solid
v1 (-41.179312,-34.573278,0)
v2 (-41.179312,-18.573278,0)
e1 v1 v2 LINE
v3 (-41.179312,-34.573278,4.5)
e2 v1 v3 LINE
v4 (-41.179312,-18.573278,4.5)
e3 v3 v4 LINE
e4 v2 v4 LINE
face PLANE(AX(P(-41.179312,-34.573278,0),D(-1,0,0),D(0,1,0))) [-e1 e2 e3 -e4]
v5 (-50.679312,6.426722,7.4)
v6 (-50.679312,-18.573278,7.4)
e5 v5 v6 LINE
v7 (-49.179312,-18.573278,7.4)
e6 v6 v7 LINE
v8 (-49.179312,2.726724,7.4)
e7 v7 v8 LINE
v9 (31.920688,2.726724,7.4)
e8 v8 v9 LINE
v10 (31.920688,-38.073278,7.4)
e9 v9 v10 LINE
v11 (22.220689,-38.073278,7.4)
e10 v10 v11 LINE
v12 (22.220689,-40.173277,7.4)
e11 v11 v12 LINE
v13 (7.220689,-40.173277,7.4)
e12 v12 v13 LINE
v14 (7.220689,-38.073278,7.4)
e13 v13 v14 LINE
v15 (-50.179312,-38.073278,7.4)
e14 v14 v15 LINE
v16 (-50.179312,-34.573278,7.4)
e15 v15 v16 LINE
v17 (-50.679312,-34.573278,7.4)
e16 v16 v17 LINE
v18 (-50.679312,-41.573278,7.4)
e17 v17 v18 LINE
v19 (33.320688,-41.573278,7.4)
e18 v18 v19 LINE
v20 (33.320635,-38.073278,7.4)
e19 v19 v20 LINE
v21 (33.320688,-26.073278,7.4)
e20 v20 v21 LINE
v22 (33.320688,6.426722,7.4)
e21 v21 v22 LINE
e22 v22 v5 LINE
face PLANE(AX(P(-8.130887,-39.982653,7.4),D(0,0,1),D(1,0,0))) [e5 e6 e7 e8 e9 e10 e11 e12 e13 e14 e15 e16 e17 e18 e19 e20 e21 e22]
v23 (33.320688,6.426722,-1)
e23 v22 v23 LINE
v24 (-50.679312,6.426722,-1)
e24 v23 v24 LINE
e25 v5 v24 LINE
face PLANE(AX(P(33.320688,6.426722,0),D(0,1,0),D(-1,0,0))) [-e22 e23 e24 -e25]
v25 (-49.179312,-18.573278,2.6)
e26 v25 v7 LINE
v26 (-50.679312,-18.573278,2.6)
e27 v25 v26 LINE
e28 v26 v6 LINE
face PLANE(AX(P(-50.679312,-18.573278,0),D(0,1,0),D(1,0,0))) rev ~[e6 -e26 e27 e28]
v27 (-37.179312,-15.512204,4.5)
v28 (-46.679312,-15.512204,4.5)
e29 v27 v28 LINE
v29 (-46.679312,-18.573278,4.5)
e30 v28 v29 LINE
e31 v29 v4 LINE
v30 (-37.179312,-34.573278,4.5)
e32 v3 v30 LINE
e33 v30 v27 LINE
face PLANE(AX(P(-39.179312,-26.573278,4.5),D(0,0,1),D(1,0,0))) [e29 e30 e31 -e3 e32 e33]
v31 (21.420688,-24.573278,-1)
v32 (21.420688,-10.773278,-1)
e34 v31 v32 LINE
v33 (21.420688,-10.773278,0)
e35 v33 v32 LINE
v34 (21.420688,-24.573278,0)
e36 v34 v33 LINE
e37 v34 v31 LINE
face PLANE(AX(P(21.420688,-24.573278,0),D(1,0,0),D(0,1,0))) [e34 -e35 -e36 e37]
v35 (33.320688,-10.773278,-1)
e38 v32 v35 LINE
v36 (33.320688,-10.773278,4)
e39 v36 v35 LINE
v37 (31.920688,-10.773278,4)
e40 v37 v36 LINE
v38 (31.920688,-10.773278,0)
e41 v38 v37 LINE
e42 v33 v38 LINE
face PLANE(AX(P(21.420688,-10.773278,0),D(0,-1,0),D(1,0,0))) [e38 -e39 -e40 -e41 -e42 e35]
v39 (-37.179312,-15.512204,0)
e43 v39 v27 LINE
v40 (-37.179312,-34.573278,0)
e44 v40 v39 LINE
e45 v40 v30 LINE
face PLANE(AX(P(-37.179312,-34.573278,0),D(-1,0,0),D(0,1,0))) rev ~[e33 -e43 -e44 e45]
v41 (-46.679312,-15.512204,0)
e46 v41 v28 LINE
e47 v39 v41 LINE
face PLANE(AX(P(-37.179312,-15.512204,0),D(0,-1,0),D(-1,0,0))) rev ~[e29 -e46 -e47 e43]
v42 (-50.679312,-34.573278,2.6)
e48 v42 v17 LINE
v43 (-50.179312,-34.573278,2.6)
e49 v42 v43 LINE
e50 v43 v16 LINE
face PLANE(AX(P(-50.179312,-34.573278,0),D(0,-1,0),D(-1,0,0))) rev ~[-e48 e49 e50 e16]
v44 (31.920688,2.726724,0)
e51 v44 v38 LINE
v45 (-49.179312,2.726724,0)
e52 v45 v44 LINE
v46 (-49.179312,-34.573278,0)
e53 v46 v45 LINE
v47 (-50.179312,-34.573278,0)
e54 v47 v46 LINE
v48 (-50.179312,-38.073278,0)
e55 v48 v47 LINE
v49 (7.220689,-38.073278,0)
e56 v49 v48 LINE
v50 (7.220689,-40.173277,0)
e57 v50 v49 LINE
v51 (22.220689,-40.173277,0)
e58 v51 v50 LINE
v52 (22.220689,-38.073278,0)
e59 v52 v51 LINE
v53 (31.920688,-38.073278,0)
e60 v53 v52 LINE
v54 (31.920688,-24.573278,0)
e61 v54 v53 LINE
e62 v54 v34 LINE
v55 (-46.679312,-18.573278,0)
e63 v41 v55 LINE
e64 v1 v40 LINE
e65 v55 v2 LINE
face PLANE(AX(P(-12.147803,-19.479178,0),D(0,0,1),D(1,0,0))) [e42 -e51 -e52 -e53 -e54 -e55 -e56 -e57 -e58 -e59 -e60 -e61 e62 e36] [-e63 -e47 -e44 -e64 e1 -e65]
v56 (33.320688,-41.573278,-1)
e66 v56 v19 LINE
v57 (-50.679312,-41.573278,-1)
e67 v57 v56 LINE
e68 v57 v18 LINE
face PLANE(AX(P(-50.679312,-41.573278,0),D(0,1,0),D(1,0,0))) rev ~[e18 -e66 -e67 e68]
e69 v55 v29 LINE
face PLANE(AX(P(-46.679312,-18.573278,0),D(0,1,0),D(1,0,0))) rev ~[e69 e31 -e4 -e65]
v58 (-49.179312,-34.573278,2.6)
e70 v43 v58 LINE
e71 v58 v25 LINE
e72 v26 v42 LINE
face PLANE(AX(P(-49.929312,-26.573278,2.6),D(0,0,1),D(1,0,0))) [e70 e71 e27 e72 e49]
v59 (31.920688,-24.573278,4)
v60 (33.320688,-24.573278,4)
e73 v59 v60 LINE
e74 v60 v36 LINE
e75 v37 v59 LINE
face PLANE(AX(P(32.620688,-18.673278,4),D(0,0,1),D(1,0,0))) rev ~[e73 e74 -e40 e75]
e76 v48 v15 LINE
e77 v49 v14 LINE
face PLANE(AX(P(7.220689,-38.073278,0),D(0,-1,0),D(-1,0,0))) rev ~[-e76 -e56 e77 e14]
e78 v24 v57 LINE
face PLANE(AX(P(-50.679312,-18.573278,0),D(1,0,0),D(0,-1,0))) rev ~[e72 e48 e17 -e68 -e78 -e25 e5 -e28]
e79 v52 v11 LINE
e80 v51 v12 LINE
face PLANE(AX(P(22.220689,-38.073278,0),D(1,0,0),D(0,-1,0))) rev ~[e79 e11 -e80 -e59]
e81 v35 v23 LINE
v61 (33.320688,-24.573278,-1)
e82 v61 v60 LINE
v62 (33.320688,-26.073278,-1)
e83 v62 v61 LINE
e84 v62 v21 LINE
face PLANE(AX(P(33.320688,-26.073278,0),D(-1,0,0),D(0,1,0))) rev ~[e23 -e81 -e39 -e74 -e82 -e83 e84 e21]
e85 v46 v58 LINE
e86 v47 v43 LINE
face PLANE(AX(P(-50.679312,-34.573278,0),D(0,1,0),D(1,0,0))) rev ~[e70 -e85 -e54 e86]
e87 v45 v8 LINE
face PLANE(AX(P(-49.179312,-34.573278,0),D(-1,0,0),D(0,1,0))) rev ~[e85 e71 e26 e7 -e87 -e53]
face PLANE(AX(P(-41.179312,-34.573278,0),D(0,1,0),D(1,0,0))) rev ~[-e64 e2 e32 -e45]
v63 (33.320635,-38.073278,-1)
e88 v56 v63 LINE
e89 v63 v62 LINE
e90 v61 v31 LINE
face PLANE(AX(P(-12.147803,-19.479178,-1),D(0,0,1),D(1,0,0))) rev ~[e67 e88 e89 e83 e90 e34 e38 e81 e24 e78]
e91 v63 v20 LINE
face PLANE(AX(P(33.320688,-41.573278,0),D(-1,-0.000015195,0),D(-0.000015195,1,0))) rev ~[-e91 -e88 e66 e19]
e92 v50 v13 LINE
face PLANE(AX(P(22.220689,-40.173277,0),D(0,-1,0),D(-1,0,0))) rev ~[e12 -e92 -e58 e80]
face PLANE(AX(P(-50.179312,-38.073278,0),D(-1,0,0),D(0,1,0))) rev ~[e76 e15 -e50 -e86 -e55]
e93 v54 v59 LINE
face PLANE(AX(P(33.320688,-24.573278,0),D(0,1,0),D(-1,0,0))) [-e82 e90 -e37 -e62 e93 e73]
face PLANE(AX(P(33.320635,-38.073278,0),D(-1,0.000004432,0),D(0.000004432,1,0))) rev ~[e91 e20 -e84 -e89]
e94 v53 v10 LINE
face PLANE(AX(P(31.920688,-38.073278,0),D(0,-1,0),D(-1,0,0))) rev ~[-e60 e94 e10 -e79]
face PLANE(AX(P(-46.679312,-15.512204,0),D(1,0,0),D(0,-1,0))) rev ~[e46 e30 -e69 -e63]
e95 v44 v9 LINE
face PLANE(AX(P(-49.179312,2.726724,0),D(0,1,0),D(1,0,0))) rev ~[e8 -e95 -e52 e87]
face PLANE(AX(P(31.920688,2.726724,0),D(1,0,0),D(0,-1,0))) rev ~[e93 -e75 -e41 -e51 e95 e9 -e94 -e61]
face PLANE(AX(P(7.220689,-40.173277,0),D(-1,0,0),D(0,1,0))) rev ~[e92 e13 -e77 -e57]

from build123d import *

# Parameters (mm, degrees)
F0_W     = 4
F0_H     = 16
F1_DEPTH = 1
F0_W_2   = 1.4000003636
F0_H_2   = 11.8
F0_H_3   = 2
F2_DEPTH = 7.4
F3_DEPTH = 2.6
F4_DEPTH = 4.5
F5_DEPTH = 4


# Not quite as in the source:
# - ends of sketch curves that miss each other by under 0.0002 mm in the source are joined
# - a feature names something its author has since deleted; it is built from what else it names


with BuildPart() as f1:
    # F0 (on Top) → F1 (new body)
    with BuildSketch(Plane.XY):
        Polygon((-46.6793118417, -34.5732776225), (-46.6793118417, -35.6732776225), (9.7206891477, -35.6732776225), (9.7206891477, -37.6732772589), (19.7206891477, -37.6732772589), (19.7206891477, -35.5732776225), (29.4207941621, -35.5732776225), (29.4207941621, -34.5732776225), (31.9206877947, -34.5732776225), (31.9206877947, -26.0732776225), (29.4206877947, -26.0732776225), (29.4206877947, -24.5732776225), (21.4206877947, -24.5732776225), (21.4206877947, -12.7732776225), (21.4206877947, -10.7732776225), (29.4206877947, -10.7732776225), (29.4206877947, 0.2267237306), (-46.6793118417, 0.2267237306), (-46.6793118417, -15.5122037977), (-37.1793118417, -15.5122037977), (-37.1793118417, -18.5732776225), (-37.1793118417, -34.5732776225), (-41.1793118417, -34.5732776225), (-41.1793118417, -18.5732776225), (-46.6793118417, -18.5732776225), (-49.1793118417, -18.5732776225), (-49.1793118417, -34.5732776225), align=None)
        Polygon((-49.1793118417, 2.7267237306), (-49.1793118417, -18.5732776225), (-46.6793118417, -18.5732776225), (-46.6793118417, -15.5122037977), (-46.6793118417, 0.2267237306), (29.4206877947, 0.2267237306), (29.4206877947, -10.7732776225), (31.9206877947, -10.7732776225), (31.9206877947, 2.7267237306), align=None)
        Polygon((-50.6793118417, -1.5732776225), (-50.6793118417, -18.5732776225), (-49.1793118417, -18.5732776225), (-49.1793118417, 2.7267237306), (31.9206877947, 2.7267237306), (31.9206877947, -10.7732776225), (33.3206881583, -10.7732776225), (33.3206881583, 6.4267223775), (30.3206881583, 6.4267223775), (-50.6793118417, 6.4267223775), align=None)
        Polygon((-46.6793118417, -35.6732776225), (-46.6793118417, -38.0732776225), (7.2206891477, -38.0732776225), (7.2206891477, -40.1732772589), (22.2206891477, -40.1732772589), (22.2206891477, -38.0732776225), (29.4207941621, -38.0732776225), (31.9206877947, -38.0732776225), (31.9206877947, -34.5732776225), (29.4207941621, -34.5732776225), (29.4207941621, -35.5732776225), (19.7206891477, -35.5732776225), (19.7206891477, -37.6732772589), (9.7206891477, -37.6732772589), (9.7206891477, -35.6732776225), align=None)
        Polygon((-50.6793118417, -38.0732776225), (-50.6793118417, -41.5732776225), (30.3206881583, -41.5732776225), (33.3206881583, -41.5732776225), (33.3206349746, -38.0732776225), (31.9206877947, -38.0732776225), (29.4207941621, -38.0732776225), (22.2206891477, -38.0732776225), (22.2206891477, -40.1732772589), (7.2206891477, -40.1732772589), (7.2206891477, -38.0732776225), (-46.6793118417, -38.0732776225), (-50.1793118417, -38.0732776225), align=None)
        Polygon((31.9206877947, -26.0732776225), (33.3206881583, -26.0732776225), (33.3206881583, -24.5732776225), (31.9206877947, -24.5732776225), (31.9206877947, -25.7732776225), align=None)
        Polygon((33.3205817909, -34.5732776225), (33.3206349746, -38.0732776225), (33.3206881583, -26.0732776225), (31.9206877947, -26.0732776225), (31.9206877947, -34.5732776225), align=None)
        Polygon((31.9206877947, -38.0732776225), (33.3206349746, -38.0732776225), (33.3205817909, -34.5732776225), (31.9206877947, -34.5732776225), align=None)
        Polygon((-50.6793118417, -18.5732776225), (-50.6793118417, -34.5732776225), (-50.1793118417, -34.5732776225), (-49.1793118417, -34.5732776225), (-49.1793118417, -18.5732776225), align=None)
        Polygon((-50.1793118417, -34.5732776225), (-50.1793118417, -38.0732776225), (-46.6793118417, -38.0732776225), (-46.6793118417, -35.6732776225), (-46.6793118417, -34.5732776225), (-49.1793118417, -34.5732776225), align=None)
        Polygon((-50.6793118417, -35.5732776225), (-50.6793118417, -38.0732776225), (-50.1793118417, -38.0732776225), (-50.1793118417, -34.5732776225), (-50.6793118417, -34.5732776225), align=None)
        with Locations((-39.1793118417, -26.5732776225)):
            Rectangle(F0_W, F0_H)
        Polygon((-46.6793118417, -15.5122037977), (-46.6793118417, -18.5732776225), (-41.1793118417, -18.5732776225), (-37.1793118417, -18.5732776225), (-37.1793118417, -15.5122037977), align=None)
        Polygon((29.4206877947, -26.0732776225), (31.9206877947, -26.0732776225), (31.9206877947, -25.7732776225), (31.9206877947, -24.5732776225), (29.4206877947, -24.5732776225), align=None)
    extrude(amount=-F1_DEPTH)

    # F0 (on Top) → F2 (join)
    with BuildSketch(Plane.XY):
        Polygon((-50.6793118417, -38.0732776225), (-50.6793118417, -41.5732776225), (30.3206881583, -41.5732776225), (33.3206881583, -41.5732776225), (33.3206349746, -38.0732776225), (31.9206877947, -38.0732776225), (29.4207941621, -38.0732776225), (22.2206891477, -38.0732776225), (22.2206891477, -40.1732772589), (7.2206891477, -40.1732772589), (7.2206891477, -38.0732776225), (-46.6793118417, -38.0732776225), (-50.1793118417, -38.0732776225), align=None)
        Polygon((-50.6793118417, -1.5732776225), (-50.6793118417, -18.5732776225), (-49.1793118417, -18.5732776225), (-49.1793118417, 2.7267237306), (31.9206877947, 2.7267237306), (31.9206877947, -10.7732776225), (33.3206881583, -10.7732776225), (33.3206881583, 6.4267223775), (30.3206881583, 6.4267223775), (-50.6793118417, 6.4267223775), align=None)
        Polygon((31.9206877947, -26.0732776225), (33.3206881583, -26.0732776225), (33.3206881583, -24.5732776225), (31.9206877947, -24.5732776225), (31.9206877947, -25.7732776225), align=None)
        Polygon((33.3205817909, -34.5732776225), (33.3206349746, -38.0732776225), (33.3206881583, -26.0732776225), (31.9206877947, -26.0732776225), (31.9206877947, -34.5732776225), align=None)
        Polygon((31.9206877947, -38.0732776225), (33.3206349746, -38.0732776225), (33.3205817909, -34.5732776225), (31.9206877947, -34.5732776225), align=None)
        Polygon((-50.6793118417, -35.5732776225), (-50.6793118417, -38.0732776225), (-50.1793118417, -38.0732776225), (-50.1793118417, -34.5732776225), (-50.6793118417, -34.5732776225), align=None)
        with Locations((32.6206879765, -18.6732776225)):
            Rectangle(F0_W_2, F0_H_2)
        with Locations((32.6206879765, -11.7732776225)):
            Rectangle(F0_W_2, F0_H_3)
    extrude(amount=F2_DEPTH)

    # F0 (on Top) → F3 (join)
    with BuildSketch(Plane.XY):
        Polygon((-50.6793118417, -18.5732776225), (-50.6793118417, -34.5732776225), (-50.1793118417, -34.5732776225), (-49.1793118417, -34.5732776225), (-49.1793118417, -18.5732776225), align=None)
    extrude(amount=F3_DEPTH)

    # F0 (on Top) → F4 (join)
    with BuildSketch(Plane.XY):
        with Locations((-39.1793118417, -26.5732776225)):
            Rectangle(F0_W, F0_H)
        Polygon((-46.6793118417, -15.5122037977), (-46.6793118417, -18.5732776225), (-41.1793118417, -18.5732776225), (-37.1793118417, -18.5732776225), (-37.1793118417, -15.5122037977), align=None)
    extrude(amount=F4_DEPTH)

    # F0 (on Top) → F5 (cut)
    with BuildSketch(Plane.XY):
        with Locations((32.6206879765, -18.6732776225)):
            Rectangle(F0_W_2, F0_H_2)
        with Locations((32.6206879765, -11.7732776225)):
            Rectangle(F0_W_2, F0_H_3)
    extrude(amount=F5_DEPTH, mode=Mode.SUBTRACT)


solid = f1.part
